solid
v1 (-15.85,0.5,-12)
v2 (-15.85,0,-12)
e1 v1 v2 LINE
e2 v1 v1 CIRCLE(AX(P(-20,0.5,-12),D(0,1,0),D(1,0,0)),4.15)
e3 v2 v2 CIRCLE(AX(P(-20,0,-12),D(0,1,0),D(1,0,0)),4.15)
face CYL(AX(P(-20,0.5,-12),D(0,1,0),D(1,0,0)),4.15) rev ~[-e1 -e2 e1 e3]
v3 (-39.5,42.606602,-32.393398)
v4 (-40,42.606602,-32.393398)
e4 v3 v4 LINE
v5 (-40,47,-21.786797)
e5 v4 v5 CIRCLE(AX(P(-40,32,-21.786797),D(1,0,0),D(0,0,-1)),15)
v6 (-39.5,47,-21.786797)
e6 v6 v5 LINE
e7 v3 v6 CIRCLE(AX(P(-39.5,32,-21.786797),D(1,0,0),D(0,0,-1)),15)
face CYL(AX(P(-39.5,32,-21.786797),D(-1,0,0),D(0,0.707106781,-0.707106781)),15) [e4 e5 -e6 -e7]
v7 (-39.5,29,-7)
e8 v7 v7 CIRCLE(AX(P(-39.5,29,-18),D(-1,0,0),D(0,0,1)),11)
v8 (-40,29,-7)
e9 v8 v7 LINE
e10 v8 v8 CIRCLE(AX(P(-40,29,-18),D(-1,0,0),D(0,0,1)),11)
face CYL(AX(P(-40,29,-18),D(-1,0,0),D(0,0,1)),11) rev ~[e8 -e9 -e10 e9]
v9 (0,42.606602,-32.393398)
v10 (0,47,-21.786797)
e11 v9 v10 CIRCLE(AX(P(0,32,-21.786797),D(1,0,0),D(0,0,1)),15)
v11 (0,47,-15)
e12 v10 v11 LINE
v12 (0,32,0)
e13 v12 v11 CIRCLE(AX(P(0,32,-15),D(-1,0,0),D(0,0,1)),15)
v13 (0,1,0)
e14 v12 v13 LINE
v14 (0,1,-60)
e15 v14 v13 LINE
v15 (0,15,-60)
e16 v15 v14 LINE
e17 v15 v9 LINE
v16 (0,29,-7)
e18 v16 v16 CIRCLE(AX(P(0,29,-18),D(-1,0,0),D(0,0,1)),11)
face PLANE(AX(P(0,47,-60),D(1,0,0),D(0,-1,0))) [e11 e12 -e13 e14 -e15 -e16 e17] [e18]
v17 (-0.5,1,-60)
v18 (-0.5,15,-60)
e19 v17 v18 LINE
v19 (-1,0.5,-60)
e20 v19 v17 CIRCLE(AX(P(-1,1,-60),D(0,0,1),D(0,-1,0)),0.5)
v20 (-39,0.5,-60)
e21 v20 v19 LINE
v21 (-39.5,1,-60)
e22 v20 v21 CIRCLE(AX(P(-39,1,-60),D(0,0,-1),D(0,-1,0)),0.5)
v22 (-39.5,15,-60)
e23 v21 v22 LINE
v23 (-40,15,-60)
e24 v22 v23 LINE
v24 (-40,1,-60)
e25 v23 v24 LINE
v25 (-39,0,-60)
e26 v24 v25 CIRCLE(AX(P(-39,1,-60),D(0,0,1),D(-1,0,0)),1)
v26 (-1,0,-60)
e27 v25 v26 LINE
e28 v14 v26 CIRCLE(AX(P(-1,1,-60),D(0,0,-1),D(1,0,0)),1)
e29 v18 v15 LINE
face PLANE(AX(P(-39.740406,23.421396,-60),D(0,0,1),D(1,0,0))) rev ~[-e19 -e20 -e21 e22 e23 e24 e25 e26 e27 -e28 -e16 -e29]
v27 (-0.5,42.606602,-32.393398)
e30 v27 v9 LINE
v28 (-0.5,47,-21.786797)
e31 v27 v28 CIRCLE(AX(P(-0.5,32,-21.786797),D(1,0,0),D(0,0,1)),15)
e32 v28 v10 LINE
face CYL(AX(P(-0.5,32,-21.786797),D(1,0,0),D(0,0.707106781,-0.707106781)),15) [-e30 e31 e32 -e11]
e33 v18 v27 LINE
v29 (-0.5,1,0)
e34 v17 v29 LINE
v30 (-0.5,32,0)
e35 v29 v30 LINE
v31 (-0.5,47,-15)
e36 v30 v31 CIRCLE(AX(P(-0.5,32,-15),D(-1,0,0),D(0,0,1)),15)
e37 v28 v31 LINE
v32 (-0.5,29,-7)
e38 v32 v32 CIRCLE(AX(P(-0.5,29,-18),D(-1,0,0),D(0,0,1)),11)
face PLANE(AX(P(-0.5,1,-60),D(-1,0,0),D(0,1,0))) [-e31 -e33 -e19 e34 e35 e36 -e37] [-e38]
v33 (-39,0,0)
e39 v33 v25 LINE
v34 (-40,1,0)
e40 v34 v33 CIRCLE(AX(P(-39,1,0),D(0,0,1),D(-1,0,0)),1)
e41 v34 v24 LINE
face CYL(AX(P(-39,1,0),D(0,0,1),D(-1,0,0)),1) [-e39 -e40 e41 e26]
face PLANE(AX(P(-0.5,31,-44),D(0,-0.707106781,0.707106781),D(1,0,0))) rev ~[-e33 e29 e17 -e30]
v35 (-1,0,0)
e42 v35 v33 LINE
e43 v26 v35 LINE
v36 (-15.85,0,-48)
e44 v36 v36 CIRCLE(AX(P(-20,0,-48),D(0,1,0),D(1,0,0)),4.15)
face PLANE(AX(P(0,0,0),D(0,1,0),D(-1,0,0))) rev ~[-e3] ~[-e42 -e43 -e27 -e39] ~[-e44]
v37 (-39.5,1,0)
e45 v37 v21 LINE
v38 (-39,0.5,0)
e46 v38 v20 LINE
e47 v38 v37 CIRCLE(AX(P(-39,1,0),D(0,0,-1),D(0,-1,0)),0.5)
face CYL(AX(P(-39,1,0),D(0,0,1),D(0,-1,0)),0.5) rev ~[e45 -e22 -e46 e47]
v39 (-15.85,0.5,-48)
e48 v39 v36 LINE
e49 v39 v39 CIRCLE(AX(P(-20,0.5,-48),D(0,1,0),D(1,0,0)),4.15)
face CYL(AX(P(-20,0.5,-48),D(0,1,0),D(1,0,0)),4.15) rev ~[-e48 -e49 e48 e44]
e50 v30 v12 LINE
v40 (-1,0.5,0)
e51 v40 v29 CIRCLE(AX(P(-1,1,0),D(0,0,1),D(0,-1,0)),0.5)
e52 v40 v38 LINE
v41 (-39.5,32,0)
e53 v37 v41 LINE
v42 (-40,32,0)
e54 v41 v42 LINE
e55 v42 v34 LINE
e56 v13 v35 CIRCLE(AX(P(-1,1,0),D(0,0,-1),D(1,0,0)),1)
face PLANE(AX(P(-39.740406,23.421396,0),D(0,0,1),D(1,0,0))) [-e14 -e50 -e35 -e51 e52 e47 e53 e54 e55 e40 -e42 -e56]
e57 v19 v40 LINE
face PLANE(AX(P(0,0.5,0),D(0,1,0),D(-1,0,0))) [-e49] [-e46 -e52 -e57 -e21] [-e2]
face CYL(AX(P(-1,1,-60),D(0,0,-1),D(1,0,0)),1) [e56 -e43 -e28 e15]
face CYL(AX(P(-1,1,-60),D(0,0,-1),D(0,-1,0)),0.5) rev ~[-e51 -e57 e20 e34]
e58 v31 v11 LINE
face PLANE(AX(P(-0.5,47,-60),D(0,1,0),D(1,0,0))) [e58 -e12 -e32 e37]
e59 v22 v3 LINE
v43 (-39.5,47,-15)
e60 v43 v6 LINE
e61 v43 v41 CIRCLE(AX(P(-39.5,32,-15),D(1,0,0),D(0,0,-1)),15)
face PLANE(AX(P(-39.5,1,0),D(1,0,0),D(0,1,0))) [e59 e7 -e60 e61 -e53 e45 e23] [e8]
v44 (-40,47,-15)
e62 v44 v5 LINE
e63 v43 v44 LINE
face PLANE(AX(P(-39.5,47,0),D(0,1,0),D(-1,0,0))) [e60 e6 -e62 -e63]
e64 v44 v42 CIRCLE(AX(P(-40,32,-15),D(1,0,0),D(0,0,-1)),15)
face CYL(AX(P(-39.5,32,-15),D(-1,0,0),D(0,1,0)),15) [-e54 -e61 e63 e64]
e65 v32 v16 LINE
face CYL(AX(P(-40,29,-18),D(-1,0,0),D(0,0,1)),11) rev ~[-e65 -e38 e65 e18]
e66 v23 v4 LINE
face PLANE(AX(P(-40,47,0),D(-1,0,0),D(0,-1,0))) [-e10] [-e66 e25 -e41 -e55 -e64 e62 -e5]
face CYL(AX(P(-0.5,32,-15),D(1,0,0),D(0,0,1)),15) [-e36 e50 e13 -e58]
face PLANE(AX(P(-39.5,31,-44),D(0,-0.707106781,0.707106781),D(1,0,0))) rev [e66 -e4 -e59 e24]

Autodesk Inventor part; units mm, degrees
ref_plane "YZ Plane" through (0, 0, 0) normal (1, 0, 0) x (0, 1, 0)
ref_plane "XZ Plane" through (0, 0, 0) normal (0, 1, 0) x (-1, 0, 0)
ref_plane "XY Plane" through (0, 0, 0) normal (0, 0, 1) x (1, 0, 0)
sketch "Sketch1" plane through (0, 0, 0) normal (0, 1, 0) x (-1, 0, 0)
  line L0 (0, 0) -> (40, 0)
  line L1 (40, 0) -> (40, -60)
  line L2 (40, -60) -> (0, -60)
  line L3 (0, -60) -> (0, 0)
  dimension "d0" = 40
  dimension "d1" = 60
extrude "Plate1" add sketch "Sketch1" along normal blind 0.5
sketch "Sketch2" plane through (-39.5, 0, 0) normal (-1, 0, 0) x (0, -1, 0)
  line L0 (0, -60) -> (0, 0)
  line L1 (0, 0) -> (-47, 0)
  line L2 (-47, 0) -> (-47, -60)
  line L3 (-47, -60) -> (0, -60)
edge flange "Flange1" height 47 angle 90 thickness 0.5 bend radius 0.5 thickness toward (-1, 0, 0) relief tear relief width 0.5 relief depth 0.25 corner gap 0.5 corner form 0 edges at (-40, 0.5, -30) (0, 0.5, -30) wall of the first edge with corners at (-39.5, 0, -60) (-39.5, 0, 0) (-39.5, 47, 0) (-39.5, 47, -60)
bend "Bend1"
corner "Corner1"
sketch "Sketch4" plane through (-40, 47, -60) normal (-1, 0, 0) x (0, 0, 1)
  circle A0 centre (42, -18) radius 11
  line L0 (60, 0) -> (60, -46) projected
  line L1 (0, 0) -> (60, 0) projected
  point P0 (60, -47)
  dimension "d14" = 22
  dimension "d15" = 18
  dimension "d16" = 18
extrude "Cut1" cut sketch "Sketch4" against normal up to surface (40 mm away)
chamfer "Corner Chamfer1" distance 32 angle 45 2 edges at (-0.25, 47, -60) (-39.75, 47, -60)
fillet "Corner Round1" radius 15 4 edges at (-39.75, 47, -28) (-39.75, 47, 0) (-0.25, 47, 0) (-0.25, 47, -28)
sketch "Sketch5" plane through (0, 0.5, 0) normal (0, 1, 0) x (1, 0, 0)
  circle A0 centre (-20, 12) radius 4.15
  circle A1 centre (-20, 48) radius 4.15
  line L0 (-1, 0) -> (-39, 0) projected
  line L1 (-39, 60) -> (-1, 60) projected
  point P0 (0, 0)
  point P1 (-20, 0)
  dimension "d23" = 8.3
  dimension "d24" = 8.3
  dimension "d25" = 12
  dimension "d26" = 12
extrude "Cut2" cut sketch "Sketch5" against normal up to surface (0.5 mm away)
equation "\"d17\" = Thickness"
equation "\"d27\" = Thickness"
equation "\"d2\" = Thickness"
equation "\"d3\" = BendReliefWidth"
equation "\"d4\" = BendReliefDepth"
equation "\"d5\" = MinimumRemnant"
equation "\"d6\" = TransitionRadius"
equation "\"d9\" = BendRadius"
equation "\"d10\" = CornerReliefSize"
equation "\"d11\" = GapSize"
equation "\"d12\" = JacobiRadiusSize"
equation "\"BendRadius\" = Thickness"
equation "\"BendReliefWidth\" = Thickness"
equation "\"BendReliefDepth\" = 0.5 * Thickness"
equation "\"CornerReliefSize\" = 4 * Thickness"
equation "\"MinimumRemnant\" = 2 * Thickness"
equation "\"TransitionRadius\" = BendRadius"
equation "\"JacobiRadiusSize\" = BendRadius"
equation "\"GapSize\" = Thickness"
equation "\"A_width\" = 46"
equation "\"A_joint_diameter\" = 16"
equation "\"A_B_spacing\" = 2"
equation "\"A_joint_tolerance\" = 3"
equation "\"l___________\" = 0"
equation "\"l__________\" = 0"
equation "\"l_________\" = 0"
equation "\"rivet_diameter\" = 3.35"
equation "\"plate_thickness\" = 3"
equation "\"l________\" = 0"
equation "\"L_Piston_Top\" = 25"
equation "\"L_Piston_Bottom\" = 21"
equation "\"Thickness\" = 0.5"
properties part number "profile_mount-1"
